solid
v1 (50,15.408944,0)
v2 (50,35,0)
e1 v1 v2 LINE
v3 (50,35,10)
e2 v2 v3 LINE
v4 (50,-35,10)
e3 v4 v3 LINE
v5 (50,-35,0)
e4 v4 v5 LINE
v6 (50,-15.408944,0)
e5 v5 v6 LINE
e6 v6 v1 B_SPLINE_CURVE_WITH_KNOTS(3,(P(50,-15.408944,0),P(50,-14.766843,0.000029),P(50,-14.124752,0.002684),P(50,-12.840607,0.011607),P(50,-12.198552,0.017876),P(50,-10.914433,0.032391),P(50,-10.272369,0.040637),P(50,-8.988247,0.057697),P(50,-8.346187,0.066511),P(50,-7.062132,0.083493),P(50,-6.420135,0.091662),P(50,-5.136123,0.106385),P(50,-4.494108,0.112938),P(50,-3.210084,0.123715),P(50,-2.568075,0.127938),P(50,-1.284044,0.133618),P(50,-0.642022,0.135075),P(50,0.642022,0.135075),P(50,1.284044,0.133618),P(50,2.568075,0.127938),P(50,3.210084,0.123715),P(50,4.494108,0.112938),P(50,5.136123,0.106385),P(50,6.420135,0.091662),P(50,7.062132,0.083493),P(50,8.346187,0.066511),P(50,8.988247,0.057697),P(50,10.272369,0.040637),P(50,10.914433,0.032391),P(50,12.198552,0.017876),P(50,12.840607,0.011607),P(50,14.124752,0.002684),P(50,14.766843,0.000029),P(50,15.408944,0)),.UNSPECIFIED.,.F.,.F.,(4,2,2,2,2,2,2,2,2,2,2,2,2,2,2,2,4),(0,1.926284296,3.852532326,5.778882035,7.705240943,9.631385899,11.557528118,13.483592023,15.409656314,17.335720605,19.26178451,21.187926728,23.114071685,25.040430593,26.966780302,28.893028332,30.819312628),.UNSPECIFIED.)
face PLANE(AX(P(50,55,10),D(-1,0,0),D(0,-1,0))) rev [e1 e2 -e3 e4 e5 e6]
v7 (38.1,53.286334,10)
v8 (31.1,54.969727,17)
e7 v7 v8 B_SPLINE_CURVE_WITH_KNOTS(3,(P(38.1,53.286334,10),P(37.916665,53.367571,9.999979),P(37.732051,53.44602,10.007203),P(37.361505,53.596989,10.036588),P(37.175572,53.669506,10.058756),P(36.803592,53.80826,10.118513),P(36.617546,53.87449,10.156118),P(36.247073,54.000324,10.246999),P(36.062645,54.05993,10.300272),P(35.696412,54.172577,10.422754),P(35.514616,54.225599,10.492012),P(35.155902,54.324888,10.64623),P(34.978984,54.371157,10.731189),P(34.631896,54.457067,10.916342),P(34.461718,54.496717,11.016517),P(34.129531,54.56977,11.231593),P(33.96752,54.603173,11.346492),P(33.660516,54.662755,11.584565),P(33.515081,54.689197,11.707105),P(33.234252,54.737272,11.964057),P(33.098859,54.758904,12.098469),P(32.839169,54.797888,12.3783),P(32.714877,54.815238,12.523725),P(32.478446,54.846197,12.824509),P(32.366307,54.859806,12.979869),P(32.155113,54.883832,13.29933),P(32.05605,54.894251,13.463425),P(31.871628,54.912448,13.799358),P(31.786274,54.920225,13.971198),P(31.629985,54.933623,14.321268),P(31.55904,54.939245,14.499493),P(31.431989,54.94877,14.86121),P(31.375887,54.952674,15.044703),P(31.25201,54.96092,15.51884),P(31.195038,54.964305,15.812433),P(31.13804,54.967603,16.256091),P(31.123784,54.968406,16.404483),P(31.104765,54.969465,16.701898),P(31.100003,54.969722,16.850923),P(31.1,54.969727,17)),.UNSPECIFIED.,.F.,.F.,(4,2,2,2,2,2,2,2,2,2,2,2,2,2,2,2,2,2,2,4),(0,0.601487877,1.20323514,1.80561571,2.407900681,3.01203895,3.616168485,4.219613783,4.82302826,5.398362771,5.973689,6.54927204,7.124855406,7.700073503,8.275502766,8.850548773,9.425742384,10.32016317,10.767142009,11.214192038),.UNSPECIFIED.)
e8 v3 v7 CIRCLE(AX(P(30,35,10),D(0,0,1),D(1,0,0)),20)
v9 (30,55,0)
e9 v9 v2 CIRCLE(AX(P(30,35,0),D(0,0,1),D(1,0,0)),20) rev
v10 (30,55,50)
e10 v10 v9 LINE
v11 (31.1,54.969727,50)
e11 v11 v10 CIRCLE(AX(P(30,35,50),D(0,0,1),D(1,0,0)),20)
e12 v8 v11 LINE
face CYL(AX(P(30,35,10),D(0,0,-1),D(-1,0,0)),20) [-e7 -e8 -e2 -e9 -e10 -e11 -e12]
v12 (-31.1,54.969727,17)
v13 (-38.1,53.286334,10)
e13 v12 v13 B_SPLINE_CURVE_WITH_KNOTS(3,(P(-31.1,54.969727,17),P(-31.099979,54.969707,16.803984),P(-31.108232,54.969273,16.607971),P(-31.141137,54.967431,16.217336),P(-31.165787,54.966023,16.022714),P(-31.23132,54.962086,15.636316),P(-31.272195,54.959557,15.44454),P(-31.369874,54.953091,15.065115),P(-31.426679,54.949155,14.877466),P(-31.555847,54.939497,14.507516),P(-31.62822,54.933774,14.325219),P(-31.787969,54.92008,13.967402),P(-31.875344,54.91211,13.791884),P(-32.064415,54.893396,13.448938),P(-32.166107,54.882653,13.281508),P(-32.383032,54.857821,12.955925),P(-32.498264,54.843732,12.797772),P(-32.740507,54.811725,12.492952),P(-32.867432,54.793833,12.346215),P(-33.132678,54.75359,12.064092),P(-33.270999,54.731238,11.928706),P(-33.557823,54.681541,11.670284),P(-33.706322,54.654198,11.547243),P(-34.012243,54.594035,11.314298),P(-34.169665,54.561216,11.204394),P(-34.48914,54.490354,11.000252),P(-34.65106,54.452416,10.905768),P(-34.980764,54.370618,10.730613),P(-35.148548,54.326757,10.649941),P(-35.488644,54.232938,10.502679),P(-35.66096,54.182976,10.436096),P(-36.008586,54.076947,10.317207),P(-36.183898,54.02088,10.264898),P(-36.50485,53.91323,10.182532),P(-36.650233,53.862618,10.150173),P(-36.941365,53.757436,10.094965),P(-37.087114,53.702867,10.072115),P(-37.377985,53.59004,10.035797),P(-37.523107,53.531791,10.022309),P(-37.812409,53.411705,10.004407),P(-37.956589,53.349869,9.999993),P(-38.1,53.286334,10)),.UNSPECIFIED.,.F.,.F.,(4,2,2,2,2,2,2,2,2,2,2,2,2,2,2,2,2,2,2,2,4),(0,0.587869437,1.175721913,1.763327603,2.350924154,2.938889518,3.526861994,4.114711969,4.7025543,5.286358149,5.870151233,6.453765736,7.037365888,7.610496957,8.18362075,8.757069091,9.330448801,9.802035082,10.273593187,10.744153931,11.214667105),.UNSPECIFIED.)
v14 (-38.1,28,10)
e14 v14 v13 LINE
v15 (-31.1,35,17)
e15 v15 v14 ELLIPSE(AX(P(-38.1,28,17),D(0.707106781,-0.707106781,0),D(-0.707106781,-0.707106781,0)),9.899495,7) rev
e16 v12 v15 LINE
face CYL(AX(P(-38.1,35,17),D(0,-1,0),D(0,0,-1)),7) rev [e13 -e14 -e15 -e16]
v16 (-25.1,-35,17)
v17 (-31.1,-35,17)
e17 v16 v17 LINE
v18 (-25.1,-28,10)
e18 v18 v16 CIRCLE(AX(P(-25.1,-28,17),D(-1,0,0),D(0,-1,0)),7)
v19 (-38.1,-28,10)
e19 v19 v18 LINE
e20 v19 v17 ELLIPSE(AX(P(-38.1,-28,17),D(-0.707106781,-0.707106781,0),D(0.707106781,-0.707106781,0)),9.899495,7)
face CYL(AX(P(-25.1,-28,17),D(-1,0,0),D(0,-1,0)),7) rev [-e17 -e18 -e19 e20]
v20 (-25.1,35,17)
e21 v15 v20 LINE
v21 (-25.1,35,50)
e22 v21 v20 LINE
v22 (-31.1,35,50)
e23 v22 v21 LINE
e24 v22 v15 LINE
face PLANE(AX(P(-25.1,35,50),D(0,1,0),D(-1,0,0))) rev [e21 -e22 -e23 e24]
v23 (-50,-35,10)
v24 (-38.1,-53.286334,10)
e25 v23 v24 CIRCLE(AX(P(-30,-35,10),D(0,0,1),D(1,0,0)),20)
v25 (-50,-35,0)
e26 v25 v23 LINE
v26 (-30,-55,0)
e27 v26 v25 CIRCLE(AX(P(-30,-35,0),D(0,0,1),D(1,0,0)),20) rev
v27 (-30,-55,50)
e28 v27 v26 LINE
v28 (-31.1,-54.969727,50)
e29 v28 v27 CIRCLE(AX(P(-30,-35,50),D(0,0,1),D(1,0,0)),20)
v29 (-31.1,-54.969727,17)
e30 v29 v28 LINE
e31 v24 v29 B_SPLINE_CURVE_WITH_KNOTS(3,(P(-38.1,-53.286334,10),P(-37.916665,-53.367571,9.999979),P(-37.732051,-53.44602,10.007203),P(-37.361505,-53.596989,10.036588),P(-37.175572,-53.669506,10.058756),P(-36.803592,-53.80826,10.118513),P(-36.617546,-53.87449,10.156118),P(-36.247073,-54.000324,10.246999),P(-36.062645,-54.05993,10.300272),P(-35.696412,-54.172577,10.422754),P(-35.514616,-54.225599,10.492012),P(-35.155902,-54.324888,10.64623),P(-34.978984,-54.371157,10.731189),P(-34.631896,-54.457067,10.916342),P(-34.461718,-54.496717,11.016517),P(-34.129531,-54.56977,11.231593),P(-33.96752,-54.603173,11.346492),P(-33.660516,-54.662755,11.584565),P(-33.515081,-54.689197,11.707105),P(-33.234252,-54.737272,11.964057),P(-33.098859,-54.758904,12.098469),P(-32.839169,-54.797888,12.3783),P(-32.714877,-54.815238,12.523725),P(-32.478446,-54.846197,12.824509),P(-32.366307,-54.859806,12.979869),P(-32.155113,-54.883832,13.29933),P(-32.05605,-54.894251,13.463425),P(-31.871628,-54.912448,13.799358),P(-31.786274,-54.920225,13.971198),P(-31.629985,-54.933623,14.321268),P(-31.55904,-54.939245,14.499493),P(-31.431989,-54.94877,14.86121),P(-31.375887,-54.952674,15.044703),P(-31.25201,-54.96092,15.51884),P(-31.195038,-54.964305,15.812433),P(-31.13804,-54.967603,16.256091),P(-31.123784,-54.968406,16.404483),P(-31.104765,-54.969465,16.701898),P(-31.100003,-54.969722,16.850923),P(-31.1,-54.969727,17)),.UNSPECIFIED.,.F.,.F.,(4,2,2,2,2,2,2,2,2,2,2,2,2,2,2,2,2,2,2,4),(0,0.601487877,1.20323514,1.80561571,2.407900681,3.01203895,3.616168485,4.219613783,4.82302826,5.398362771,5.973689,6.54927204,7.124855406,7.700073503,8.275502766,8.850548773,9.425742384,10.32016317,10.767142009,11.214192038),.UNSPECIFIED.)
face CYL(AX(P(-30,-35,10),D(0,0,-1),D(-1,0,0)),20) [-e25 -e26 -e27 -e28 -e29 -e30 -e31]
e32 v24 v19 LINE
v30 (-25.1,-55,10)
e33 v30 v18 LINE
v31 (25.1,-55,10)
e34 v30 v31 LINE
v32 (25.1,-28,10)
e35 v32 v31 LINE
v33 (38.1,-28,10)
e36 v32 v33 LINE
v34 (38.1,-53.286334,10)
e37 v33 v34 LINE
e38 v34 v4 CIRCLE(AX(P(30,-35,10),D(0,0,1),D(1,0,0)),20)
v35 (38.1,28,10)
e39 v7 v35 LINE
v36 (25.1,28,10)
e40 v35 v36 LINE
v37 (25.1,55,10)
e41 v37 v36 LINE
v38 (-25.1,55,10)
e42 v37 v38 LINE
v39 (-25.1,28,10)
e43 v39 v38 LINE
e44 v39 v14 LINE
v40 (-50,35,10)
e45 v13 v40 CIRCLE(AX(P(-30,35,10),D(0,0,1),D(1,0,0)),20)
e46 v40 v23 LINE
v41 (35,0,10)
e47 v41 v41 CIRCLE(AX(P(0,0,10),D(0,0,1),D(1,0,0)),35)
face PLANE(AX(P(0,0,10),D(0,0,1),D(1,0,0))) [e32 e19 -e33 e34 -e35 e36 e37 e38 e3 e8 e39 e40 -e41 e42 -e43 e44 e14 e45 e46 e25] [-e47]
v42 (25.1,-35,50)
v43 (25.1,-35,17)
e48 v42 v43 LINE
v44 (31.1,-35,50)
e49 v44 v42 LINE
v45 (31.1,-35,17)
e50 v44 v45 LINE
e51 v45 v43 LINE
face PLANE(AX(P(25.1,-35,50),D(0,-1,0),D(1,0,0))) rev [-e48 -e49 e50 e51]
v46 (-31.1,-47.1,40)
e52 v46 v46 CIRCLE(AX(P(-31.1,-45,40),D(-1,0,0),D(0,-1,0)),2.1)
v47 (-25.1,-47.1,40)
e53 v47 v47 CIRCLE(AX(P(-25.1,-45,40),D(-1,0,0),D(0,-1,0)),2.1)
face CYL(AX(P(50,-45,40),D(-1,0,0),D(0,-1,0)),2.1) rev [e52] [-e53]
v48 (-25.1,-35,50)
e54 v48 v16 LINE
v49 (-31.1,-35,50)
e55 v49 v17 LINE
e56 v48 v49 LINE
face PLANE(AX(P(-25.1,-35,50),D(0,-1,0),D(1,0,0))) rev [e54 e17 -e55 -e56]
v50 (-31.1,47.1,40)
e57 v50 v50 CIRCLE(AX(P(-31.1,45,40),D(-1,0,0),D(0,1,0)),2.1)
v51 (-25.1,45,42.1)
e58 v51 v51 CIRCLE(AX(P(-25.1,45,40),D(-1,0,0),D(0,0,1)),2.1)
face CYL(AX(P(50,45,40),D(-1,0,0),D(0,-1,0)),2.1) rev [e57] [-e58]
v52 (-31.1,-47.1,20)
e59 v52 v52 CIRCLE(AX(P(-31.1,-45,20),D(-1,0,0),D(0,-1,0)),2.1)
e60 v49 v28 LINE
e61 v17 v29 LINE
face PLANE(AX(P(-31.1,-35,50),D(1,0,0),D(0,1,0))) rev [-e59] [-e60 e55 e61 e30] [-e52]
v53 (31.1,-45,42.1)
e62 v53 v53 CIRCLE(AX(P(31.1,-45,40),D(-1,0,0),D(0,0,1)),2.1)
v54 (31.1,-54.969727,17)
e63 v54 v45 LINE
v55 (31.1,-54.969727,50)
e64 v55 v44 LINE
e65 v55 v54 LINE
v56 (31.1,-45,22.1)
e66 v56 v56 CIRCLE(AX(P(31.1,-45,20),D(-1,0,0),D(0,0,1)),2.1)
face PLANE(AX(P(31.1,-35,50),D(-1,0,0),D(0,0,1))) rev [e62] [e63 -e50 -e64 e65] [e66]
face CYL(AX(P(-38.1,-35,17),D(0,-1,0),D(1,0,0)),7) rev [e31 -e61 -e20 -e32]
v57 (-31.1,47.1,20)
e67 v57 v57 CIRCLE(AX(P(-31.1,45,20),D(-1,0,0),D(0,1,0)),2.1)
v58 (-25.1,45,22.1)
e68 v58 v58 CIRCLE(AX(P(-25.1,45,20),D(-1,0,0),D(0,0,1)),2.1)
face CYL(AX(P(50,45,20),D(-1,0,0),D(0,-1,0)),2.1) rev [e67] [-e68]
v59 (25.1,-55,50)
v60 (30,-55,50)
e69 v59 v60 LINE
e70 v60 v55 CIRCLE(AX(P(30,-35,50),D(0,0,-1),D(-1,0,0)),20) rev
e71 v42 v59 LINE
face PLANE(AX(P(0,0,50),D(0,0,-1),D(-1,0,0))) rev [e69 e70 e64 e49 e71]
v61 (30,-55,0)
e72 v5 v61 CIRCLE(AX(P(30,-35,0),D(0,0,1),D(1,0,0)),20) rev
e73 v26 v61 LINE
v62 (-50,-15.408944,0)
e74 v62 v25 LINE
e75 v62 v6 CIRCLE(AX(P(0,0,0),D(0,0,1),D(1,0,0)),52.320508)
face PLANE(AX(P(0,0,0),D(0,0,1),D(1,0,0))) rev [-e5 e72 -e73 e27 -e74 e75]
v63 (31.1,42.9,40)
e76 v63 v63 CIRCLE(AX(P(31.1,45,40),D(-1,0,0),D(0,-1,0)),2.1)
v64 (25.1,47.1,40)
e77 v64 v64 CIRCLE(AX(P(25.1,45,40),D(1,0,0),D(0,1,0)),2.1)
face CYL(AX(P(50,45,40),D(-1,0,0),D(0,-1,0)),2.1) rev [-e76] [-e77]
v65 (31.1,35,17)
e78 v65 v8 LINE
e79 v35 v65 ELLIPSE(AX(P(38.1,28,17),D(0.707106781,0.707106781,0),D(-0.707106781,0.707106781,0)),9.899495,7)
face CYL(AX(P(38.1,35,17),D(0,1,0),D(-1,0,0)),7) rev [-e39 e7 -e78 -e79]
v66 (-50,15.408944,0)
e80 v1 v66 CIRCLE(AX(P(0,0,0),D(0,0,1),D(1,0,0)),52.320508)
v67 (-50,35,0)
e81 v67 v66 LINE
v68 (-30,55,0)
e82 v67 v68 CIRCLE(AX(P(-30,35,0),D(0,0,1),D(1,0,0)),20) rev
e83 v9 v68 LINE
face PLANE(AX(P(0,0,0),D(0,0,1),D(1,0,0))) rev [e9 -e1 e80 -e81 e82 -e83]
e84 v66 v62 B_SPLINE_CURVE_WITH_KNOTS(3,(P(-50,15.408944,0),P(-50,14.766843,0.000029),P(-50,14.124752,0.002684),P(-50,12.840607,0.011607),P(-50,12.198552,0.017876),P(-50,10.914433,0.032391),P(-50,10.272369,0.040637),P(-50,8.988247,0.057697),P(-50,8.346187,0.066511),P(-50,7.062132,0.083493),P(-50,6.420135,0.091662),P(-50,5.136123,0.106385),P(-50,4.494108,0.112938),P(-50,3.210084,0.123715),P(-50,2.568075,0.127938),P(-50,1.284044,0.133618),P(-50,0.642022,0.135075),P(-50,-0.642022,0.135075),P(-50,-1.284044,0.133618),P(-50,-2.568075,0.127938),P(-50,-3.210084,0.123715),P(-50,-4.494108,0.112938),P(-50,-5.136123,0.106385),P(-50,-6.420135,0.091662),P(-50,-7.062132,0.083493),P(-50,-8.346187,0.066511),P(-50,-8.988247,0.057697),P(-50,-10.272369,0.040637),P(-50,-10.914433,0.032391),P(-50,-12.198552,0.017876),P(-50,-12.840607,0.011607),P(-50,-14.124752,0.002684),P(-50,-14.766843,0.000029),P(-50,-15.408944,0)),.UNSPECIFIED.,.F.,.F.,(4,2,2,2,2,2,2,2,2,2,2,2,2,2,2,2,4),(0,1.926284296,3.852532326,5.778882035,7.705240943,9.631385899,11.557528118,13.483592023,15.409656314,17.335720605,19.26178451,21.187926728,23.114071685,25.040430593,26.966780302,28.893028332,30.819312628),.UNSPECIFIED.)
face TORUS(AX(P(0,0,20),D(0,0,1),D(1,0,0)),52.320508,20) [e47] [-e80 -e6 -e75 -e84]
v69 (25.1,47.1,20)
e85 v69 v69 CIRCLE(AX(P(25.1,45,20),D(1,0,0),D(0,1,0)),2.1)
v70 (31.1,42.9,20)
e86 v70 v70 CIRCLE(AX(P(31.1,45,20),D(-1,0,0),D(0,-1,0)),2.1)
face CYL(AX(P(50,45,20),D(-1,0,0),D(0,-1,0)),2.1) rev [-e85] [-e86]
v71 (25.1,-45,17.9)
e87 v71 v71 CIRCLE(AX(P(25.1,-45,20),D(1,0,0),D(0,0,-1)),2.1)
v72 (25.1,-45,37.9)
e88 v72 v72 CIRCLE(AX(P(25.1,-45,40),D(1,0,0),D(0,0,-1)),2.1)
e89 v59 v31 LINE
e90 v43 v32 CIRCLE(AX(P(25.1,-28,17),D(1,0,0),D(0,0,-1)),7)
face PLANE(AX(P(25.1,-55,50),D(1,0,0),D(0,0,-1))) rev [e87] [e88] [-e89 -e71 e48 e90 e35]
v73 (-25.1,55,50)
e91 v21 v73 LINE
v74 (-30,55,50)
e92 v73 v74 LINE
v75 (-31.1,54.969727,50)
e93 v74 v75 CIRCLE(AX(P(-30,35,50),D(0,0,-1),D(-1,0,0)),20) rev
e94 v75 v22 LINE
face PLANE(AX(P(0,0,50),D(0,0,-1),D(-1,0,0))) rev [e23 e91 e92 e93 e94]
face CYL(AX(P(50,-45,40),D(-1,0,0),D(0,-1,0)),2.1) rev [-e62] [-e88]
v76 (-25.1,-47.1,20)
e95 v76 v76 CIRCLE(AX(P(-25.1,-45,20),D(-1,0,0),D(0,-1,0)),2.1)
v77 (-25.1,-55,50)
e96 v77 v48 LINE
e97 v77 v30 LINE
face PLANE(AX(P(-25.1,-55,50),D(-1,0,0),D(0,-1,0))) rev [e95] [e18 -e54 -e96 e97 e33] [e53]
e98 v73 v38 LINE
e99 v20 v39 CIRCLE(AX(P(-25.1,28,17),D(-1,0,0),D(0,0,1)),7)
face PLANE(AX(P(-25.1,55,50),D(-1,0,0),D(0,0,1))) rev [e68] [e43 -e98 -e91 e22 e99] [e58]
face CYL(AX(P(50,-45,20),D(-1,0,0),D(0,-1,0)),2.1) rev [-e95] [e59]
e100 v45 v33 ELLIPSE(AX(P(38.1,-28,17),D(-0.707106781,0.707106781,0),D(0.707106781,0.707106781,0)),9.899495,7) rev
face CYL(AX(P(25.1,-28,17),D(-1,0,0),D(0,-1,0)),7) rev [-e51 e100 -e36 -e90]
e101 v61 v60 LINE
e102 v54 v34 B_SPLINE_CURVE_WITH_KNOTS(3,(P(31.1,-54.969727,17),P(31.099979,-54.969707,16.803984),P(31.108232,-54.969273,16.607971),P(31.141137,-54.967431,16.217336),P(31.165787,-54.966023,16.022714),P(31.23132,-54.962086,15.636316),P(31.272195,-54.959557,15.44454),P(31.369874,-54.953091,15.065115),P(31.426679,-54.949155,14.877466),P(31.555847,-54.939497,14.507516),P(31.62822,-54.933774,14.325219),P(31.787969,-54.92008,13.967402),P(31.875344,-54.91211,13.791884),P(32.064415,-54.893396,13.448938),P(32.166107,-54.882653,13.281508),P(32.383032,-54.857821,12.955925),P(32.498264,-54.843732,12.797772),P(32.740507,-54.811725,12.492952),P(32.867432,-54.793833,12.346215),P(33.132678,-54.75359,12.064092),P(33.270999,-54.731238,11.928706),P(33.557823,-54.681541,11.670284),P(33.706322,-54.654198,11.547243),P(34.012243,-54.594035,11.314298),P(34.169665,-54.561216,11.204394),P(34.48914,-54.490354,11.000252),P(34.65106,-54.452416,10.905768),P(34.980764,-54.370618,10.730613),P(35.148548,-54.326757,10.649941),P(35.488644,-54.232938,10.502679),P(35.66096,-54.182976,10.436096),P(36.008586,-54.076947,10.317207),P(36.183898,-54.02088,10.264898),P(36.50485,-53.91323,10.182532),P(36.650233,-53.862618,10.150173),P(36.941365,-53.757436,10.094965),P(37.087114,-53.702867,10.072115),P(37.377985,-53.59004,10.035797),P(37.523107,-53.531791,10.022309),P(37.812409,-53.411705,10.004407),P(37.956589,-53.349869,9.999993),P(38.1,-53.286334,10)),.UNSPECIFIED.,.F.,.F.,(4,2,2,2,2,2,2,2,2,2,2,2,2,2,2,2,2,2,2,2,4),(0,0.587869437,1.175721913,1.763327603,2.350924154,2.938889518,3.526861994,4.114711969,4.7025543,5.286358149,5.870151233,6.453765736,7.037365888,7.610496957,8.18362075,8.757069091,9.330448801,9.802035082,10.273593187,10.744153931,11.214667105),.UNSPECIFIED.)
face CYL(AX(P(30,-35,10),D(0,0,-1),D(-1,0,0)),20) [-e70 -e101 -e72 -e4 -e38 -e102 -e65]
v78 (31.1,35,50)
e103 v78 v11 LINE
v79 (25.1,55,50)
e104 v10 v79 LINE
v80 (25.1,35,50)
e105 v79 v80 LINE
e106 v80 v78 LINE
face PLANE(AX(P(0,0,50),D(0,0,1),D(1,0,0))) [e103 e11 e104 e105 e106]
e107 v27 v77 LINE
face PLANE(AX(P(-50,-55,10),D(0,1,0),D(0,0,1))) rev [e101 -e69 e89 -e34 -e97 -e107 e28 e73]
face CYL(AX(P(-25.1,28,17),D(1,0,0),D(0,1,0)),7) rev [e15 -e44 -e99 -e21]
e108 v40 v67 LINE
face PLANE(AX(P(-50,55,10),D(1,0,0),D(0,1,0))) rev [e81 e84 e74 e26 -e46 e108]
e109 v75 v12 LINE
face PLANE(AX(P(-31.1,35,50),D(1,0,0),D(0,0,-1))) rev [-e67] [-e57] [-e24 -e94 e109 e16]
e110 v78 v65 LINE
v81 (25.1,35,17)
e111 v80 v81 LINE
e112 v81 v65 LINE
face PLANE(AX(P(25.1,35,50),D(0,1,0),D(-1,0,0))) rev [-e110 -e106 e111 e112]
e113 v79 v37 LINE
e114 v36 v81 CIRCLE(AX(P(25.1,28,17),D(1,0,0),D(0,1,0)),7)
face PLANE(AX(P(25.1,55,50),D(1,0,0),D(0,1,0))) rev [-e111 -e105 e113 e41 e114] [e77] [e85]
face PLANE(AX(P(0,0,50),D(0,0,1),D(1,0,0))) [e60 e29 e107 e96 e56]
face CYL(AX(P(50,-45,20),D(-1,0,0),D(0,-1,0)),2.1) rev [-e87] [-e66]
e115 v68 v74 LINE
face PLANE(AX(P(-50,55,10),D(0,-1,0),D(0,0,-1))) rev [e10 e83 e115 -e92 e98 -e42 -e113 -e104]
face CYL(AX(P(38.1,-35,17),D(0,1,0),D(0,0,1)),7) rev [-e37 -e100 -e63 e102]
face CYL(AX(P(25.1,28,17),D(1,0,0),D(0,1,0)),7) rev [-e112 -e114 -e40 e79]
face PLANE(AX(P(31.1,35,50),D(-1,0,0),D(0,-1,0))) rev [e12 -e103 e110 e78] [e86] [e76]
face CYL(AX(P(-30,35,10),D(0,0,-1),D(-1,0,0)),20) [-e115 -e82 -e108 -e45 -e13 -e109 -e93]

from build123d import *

# Parameters (mm, degrees)
SKETCH_1_W          = 100
SKETCH_1_H          = 110
SKETCH_1_R          = 35
EXTRUDE_1_DEPTH     = 10
SKETCH_2_W          = 6
SKETCH_2_H          = 20
EXTRUDE_2_DEPTH     = 40
FILLET_1_R          = 20
FILLET_2_R          = 7
SKETCH_3_R          = 2.1
CUT_EXTRUDE_1_DEPTH = 111.01004512
FILLET_3_R          = 20


with BuildPart() as part:
    # 草图1 → 凸台-拉伸1 (new body)
    with BuildSketch(Plane.XY):
        Rectangle(SKETCH_1_W, SKETCH_1_H)
        Circle(SKETCH_1_R, mode=Mode.SUBTRACT)
    extrude(amount=EXTRUDE_1_DEPTH)

    # 草图2 → 凸台-拉伸2 (add)
    with BuildSketch(Plane.XY.offset(10)):
        with Locations((-28.1, 45)):
            Rectangle(SKETCH_2_W, SKETCH_2_H)
        with Locations((28.1, 45)):
            Rectangle(SKETCH_2_W, SKETCH_2_H)
        with Locations((28.1, -45)):
            Rectangle(SKETCH_2_W, SKETCH_2_H)
        with Locations((-28.1, -45)):
            Rectangle(SKETCH_2_W, SKETCH_2_H)
    extrude(amount=EXTRUDE_2_DEPTH)

    # 圆角1
    # the kernel refuses this fillet: 20 mm, written as the material it takes off along each edge
    with BuildSketch(Plane(origin=(0, 0, 0), x_dir=(1, 0, 0), z_dir=(0, -1, 0))) as fillet_1_piece_1:
        with BuildLine():
            CenterArc((52.320508076, 20), FILLET_1_R, 210, 60)
            Line((35, 10), (35, 0))
            Line((35, 0), (52.320508076, 0))
        make_face()
    revolve(axis=Axis((0, 0, 0), (0, 0, 1)), mode=Mode.SUBTRACT)

    # 圆角2
    fillet_2_edges = [part.edges().sort_by_distance(p)[0] for p in [
        (-31.1, 45, 10),
        (-28.1, 35, 10),
        (28.1, 35, 10),
        (31.1, 45, 10),
        (31.1, -45, 10),
        (28.1, -35, 10),
        (-28.1, -35, 10),
        (-31.1, -45, 10),
    ]]
    fillet(fillet_2_edges, radius=FILLET_2_R)

    # 草图3 → 切除-拉伸1 (cut, through all)
    with BuildSketch(Plane.ZY.offset(31.1)):
        with Locations(Location((20, -45, 0), (0, 0, 270))):
            Circle(SKETCH_3_R)
        with Locations(Location((40, -45, 0), (0, 0, 270))):
            Circle(SKETCH_3_R)
        with Locations(Location((40, 45, 0), (0, 0, 270))):
            Circle(SKETCH_3_R)
        with Locations(Location((20, 45, 0), (0, 0, 270))):
            Circle(SKETCH_3_R)
    extrude(amount=-CUT_EXTRUDE_1_DEPTH, mode=Mode.SUBTRACT)

    # 圆角3
    fillet_3_edges = [part.edges().sort_by_distance(p)[0] for p in [
        (50, -55, 5),
        (50, 55, 5),
        (-50, 55, 5),
        (-50, -55, 5),
    ]]
    fillet(fillet_3_edges, radius=FILLET_3_R)


solid = part.part
